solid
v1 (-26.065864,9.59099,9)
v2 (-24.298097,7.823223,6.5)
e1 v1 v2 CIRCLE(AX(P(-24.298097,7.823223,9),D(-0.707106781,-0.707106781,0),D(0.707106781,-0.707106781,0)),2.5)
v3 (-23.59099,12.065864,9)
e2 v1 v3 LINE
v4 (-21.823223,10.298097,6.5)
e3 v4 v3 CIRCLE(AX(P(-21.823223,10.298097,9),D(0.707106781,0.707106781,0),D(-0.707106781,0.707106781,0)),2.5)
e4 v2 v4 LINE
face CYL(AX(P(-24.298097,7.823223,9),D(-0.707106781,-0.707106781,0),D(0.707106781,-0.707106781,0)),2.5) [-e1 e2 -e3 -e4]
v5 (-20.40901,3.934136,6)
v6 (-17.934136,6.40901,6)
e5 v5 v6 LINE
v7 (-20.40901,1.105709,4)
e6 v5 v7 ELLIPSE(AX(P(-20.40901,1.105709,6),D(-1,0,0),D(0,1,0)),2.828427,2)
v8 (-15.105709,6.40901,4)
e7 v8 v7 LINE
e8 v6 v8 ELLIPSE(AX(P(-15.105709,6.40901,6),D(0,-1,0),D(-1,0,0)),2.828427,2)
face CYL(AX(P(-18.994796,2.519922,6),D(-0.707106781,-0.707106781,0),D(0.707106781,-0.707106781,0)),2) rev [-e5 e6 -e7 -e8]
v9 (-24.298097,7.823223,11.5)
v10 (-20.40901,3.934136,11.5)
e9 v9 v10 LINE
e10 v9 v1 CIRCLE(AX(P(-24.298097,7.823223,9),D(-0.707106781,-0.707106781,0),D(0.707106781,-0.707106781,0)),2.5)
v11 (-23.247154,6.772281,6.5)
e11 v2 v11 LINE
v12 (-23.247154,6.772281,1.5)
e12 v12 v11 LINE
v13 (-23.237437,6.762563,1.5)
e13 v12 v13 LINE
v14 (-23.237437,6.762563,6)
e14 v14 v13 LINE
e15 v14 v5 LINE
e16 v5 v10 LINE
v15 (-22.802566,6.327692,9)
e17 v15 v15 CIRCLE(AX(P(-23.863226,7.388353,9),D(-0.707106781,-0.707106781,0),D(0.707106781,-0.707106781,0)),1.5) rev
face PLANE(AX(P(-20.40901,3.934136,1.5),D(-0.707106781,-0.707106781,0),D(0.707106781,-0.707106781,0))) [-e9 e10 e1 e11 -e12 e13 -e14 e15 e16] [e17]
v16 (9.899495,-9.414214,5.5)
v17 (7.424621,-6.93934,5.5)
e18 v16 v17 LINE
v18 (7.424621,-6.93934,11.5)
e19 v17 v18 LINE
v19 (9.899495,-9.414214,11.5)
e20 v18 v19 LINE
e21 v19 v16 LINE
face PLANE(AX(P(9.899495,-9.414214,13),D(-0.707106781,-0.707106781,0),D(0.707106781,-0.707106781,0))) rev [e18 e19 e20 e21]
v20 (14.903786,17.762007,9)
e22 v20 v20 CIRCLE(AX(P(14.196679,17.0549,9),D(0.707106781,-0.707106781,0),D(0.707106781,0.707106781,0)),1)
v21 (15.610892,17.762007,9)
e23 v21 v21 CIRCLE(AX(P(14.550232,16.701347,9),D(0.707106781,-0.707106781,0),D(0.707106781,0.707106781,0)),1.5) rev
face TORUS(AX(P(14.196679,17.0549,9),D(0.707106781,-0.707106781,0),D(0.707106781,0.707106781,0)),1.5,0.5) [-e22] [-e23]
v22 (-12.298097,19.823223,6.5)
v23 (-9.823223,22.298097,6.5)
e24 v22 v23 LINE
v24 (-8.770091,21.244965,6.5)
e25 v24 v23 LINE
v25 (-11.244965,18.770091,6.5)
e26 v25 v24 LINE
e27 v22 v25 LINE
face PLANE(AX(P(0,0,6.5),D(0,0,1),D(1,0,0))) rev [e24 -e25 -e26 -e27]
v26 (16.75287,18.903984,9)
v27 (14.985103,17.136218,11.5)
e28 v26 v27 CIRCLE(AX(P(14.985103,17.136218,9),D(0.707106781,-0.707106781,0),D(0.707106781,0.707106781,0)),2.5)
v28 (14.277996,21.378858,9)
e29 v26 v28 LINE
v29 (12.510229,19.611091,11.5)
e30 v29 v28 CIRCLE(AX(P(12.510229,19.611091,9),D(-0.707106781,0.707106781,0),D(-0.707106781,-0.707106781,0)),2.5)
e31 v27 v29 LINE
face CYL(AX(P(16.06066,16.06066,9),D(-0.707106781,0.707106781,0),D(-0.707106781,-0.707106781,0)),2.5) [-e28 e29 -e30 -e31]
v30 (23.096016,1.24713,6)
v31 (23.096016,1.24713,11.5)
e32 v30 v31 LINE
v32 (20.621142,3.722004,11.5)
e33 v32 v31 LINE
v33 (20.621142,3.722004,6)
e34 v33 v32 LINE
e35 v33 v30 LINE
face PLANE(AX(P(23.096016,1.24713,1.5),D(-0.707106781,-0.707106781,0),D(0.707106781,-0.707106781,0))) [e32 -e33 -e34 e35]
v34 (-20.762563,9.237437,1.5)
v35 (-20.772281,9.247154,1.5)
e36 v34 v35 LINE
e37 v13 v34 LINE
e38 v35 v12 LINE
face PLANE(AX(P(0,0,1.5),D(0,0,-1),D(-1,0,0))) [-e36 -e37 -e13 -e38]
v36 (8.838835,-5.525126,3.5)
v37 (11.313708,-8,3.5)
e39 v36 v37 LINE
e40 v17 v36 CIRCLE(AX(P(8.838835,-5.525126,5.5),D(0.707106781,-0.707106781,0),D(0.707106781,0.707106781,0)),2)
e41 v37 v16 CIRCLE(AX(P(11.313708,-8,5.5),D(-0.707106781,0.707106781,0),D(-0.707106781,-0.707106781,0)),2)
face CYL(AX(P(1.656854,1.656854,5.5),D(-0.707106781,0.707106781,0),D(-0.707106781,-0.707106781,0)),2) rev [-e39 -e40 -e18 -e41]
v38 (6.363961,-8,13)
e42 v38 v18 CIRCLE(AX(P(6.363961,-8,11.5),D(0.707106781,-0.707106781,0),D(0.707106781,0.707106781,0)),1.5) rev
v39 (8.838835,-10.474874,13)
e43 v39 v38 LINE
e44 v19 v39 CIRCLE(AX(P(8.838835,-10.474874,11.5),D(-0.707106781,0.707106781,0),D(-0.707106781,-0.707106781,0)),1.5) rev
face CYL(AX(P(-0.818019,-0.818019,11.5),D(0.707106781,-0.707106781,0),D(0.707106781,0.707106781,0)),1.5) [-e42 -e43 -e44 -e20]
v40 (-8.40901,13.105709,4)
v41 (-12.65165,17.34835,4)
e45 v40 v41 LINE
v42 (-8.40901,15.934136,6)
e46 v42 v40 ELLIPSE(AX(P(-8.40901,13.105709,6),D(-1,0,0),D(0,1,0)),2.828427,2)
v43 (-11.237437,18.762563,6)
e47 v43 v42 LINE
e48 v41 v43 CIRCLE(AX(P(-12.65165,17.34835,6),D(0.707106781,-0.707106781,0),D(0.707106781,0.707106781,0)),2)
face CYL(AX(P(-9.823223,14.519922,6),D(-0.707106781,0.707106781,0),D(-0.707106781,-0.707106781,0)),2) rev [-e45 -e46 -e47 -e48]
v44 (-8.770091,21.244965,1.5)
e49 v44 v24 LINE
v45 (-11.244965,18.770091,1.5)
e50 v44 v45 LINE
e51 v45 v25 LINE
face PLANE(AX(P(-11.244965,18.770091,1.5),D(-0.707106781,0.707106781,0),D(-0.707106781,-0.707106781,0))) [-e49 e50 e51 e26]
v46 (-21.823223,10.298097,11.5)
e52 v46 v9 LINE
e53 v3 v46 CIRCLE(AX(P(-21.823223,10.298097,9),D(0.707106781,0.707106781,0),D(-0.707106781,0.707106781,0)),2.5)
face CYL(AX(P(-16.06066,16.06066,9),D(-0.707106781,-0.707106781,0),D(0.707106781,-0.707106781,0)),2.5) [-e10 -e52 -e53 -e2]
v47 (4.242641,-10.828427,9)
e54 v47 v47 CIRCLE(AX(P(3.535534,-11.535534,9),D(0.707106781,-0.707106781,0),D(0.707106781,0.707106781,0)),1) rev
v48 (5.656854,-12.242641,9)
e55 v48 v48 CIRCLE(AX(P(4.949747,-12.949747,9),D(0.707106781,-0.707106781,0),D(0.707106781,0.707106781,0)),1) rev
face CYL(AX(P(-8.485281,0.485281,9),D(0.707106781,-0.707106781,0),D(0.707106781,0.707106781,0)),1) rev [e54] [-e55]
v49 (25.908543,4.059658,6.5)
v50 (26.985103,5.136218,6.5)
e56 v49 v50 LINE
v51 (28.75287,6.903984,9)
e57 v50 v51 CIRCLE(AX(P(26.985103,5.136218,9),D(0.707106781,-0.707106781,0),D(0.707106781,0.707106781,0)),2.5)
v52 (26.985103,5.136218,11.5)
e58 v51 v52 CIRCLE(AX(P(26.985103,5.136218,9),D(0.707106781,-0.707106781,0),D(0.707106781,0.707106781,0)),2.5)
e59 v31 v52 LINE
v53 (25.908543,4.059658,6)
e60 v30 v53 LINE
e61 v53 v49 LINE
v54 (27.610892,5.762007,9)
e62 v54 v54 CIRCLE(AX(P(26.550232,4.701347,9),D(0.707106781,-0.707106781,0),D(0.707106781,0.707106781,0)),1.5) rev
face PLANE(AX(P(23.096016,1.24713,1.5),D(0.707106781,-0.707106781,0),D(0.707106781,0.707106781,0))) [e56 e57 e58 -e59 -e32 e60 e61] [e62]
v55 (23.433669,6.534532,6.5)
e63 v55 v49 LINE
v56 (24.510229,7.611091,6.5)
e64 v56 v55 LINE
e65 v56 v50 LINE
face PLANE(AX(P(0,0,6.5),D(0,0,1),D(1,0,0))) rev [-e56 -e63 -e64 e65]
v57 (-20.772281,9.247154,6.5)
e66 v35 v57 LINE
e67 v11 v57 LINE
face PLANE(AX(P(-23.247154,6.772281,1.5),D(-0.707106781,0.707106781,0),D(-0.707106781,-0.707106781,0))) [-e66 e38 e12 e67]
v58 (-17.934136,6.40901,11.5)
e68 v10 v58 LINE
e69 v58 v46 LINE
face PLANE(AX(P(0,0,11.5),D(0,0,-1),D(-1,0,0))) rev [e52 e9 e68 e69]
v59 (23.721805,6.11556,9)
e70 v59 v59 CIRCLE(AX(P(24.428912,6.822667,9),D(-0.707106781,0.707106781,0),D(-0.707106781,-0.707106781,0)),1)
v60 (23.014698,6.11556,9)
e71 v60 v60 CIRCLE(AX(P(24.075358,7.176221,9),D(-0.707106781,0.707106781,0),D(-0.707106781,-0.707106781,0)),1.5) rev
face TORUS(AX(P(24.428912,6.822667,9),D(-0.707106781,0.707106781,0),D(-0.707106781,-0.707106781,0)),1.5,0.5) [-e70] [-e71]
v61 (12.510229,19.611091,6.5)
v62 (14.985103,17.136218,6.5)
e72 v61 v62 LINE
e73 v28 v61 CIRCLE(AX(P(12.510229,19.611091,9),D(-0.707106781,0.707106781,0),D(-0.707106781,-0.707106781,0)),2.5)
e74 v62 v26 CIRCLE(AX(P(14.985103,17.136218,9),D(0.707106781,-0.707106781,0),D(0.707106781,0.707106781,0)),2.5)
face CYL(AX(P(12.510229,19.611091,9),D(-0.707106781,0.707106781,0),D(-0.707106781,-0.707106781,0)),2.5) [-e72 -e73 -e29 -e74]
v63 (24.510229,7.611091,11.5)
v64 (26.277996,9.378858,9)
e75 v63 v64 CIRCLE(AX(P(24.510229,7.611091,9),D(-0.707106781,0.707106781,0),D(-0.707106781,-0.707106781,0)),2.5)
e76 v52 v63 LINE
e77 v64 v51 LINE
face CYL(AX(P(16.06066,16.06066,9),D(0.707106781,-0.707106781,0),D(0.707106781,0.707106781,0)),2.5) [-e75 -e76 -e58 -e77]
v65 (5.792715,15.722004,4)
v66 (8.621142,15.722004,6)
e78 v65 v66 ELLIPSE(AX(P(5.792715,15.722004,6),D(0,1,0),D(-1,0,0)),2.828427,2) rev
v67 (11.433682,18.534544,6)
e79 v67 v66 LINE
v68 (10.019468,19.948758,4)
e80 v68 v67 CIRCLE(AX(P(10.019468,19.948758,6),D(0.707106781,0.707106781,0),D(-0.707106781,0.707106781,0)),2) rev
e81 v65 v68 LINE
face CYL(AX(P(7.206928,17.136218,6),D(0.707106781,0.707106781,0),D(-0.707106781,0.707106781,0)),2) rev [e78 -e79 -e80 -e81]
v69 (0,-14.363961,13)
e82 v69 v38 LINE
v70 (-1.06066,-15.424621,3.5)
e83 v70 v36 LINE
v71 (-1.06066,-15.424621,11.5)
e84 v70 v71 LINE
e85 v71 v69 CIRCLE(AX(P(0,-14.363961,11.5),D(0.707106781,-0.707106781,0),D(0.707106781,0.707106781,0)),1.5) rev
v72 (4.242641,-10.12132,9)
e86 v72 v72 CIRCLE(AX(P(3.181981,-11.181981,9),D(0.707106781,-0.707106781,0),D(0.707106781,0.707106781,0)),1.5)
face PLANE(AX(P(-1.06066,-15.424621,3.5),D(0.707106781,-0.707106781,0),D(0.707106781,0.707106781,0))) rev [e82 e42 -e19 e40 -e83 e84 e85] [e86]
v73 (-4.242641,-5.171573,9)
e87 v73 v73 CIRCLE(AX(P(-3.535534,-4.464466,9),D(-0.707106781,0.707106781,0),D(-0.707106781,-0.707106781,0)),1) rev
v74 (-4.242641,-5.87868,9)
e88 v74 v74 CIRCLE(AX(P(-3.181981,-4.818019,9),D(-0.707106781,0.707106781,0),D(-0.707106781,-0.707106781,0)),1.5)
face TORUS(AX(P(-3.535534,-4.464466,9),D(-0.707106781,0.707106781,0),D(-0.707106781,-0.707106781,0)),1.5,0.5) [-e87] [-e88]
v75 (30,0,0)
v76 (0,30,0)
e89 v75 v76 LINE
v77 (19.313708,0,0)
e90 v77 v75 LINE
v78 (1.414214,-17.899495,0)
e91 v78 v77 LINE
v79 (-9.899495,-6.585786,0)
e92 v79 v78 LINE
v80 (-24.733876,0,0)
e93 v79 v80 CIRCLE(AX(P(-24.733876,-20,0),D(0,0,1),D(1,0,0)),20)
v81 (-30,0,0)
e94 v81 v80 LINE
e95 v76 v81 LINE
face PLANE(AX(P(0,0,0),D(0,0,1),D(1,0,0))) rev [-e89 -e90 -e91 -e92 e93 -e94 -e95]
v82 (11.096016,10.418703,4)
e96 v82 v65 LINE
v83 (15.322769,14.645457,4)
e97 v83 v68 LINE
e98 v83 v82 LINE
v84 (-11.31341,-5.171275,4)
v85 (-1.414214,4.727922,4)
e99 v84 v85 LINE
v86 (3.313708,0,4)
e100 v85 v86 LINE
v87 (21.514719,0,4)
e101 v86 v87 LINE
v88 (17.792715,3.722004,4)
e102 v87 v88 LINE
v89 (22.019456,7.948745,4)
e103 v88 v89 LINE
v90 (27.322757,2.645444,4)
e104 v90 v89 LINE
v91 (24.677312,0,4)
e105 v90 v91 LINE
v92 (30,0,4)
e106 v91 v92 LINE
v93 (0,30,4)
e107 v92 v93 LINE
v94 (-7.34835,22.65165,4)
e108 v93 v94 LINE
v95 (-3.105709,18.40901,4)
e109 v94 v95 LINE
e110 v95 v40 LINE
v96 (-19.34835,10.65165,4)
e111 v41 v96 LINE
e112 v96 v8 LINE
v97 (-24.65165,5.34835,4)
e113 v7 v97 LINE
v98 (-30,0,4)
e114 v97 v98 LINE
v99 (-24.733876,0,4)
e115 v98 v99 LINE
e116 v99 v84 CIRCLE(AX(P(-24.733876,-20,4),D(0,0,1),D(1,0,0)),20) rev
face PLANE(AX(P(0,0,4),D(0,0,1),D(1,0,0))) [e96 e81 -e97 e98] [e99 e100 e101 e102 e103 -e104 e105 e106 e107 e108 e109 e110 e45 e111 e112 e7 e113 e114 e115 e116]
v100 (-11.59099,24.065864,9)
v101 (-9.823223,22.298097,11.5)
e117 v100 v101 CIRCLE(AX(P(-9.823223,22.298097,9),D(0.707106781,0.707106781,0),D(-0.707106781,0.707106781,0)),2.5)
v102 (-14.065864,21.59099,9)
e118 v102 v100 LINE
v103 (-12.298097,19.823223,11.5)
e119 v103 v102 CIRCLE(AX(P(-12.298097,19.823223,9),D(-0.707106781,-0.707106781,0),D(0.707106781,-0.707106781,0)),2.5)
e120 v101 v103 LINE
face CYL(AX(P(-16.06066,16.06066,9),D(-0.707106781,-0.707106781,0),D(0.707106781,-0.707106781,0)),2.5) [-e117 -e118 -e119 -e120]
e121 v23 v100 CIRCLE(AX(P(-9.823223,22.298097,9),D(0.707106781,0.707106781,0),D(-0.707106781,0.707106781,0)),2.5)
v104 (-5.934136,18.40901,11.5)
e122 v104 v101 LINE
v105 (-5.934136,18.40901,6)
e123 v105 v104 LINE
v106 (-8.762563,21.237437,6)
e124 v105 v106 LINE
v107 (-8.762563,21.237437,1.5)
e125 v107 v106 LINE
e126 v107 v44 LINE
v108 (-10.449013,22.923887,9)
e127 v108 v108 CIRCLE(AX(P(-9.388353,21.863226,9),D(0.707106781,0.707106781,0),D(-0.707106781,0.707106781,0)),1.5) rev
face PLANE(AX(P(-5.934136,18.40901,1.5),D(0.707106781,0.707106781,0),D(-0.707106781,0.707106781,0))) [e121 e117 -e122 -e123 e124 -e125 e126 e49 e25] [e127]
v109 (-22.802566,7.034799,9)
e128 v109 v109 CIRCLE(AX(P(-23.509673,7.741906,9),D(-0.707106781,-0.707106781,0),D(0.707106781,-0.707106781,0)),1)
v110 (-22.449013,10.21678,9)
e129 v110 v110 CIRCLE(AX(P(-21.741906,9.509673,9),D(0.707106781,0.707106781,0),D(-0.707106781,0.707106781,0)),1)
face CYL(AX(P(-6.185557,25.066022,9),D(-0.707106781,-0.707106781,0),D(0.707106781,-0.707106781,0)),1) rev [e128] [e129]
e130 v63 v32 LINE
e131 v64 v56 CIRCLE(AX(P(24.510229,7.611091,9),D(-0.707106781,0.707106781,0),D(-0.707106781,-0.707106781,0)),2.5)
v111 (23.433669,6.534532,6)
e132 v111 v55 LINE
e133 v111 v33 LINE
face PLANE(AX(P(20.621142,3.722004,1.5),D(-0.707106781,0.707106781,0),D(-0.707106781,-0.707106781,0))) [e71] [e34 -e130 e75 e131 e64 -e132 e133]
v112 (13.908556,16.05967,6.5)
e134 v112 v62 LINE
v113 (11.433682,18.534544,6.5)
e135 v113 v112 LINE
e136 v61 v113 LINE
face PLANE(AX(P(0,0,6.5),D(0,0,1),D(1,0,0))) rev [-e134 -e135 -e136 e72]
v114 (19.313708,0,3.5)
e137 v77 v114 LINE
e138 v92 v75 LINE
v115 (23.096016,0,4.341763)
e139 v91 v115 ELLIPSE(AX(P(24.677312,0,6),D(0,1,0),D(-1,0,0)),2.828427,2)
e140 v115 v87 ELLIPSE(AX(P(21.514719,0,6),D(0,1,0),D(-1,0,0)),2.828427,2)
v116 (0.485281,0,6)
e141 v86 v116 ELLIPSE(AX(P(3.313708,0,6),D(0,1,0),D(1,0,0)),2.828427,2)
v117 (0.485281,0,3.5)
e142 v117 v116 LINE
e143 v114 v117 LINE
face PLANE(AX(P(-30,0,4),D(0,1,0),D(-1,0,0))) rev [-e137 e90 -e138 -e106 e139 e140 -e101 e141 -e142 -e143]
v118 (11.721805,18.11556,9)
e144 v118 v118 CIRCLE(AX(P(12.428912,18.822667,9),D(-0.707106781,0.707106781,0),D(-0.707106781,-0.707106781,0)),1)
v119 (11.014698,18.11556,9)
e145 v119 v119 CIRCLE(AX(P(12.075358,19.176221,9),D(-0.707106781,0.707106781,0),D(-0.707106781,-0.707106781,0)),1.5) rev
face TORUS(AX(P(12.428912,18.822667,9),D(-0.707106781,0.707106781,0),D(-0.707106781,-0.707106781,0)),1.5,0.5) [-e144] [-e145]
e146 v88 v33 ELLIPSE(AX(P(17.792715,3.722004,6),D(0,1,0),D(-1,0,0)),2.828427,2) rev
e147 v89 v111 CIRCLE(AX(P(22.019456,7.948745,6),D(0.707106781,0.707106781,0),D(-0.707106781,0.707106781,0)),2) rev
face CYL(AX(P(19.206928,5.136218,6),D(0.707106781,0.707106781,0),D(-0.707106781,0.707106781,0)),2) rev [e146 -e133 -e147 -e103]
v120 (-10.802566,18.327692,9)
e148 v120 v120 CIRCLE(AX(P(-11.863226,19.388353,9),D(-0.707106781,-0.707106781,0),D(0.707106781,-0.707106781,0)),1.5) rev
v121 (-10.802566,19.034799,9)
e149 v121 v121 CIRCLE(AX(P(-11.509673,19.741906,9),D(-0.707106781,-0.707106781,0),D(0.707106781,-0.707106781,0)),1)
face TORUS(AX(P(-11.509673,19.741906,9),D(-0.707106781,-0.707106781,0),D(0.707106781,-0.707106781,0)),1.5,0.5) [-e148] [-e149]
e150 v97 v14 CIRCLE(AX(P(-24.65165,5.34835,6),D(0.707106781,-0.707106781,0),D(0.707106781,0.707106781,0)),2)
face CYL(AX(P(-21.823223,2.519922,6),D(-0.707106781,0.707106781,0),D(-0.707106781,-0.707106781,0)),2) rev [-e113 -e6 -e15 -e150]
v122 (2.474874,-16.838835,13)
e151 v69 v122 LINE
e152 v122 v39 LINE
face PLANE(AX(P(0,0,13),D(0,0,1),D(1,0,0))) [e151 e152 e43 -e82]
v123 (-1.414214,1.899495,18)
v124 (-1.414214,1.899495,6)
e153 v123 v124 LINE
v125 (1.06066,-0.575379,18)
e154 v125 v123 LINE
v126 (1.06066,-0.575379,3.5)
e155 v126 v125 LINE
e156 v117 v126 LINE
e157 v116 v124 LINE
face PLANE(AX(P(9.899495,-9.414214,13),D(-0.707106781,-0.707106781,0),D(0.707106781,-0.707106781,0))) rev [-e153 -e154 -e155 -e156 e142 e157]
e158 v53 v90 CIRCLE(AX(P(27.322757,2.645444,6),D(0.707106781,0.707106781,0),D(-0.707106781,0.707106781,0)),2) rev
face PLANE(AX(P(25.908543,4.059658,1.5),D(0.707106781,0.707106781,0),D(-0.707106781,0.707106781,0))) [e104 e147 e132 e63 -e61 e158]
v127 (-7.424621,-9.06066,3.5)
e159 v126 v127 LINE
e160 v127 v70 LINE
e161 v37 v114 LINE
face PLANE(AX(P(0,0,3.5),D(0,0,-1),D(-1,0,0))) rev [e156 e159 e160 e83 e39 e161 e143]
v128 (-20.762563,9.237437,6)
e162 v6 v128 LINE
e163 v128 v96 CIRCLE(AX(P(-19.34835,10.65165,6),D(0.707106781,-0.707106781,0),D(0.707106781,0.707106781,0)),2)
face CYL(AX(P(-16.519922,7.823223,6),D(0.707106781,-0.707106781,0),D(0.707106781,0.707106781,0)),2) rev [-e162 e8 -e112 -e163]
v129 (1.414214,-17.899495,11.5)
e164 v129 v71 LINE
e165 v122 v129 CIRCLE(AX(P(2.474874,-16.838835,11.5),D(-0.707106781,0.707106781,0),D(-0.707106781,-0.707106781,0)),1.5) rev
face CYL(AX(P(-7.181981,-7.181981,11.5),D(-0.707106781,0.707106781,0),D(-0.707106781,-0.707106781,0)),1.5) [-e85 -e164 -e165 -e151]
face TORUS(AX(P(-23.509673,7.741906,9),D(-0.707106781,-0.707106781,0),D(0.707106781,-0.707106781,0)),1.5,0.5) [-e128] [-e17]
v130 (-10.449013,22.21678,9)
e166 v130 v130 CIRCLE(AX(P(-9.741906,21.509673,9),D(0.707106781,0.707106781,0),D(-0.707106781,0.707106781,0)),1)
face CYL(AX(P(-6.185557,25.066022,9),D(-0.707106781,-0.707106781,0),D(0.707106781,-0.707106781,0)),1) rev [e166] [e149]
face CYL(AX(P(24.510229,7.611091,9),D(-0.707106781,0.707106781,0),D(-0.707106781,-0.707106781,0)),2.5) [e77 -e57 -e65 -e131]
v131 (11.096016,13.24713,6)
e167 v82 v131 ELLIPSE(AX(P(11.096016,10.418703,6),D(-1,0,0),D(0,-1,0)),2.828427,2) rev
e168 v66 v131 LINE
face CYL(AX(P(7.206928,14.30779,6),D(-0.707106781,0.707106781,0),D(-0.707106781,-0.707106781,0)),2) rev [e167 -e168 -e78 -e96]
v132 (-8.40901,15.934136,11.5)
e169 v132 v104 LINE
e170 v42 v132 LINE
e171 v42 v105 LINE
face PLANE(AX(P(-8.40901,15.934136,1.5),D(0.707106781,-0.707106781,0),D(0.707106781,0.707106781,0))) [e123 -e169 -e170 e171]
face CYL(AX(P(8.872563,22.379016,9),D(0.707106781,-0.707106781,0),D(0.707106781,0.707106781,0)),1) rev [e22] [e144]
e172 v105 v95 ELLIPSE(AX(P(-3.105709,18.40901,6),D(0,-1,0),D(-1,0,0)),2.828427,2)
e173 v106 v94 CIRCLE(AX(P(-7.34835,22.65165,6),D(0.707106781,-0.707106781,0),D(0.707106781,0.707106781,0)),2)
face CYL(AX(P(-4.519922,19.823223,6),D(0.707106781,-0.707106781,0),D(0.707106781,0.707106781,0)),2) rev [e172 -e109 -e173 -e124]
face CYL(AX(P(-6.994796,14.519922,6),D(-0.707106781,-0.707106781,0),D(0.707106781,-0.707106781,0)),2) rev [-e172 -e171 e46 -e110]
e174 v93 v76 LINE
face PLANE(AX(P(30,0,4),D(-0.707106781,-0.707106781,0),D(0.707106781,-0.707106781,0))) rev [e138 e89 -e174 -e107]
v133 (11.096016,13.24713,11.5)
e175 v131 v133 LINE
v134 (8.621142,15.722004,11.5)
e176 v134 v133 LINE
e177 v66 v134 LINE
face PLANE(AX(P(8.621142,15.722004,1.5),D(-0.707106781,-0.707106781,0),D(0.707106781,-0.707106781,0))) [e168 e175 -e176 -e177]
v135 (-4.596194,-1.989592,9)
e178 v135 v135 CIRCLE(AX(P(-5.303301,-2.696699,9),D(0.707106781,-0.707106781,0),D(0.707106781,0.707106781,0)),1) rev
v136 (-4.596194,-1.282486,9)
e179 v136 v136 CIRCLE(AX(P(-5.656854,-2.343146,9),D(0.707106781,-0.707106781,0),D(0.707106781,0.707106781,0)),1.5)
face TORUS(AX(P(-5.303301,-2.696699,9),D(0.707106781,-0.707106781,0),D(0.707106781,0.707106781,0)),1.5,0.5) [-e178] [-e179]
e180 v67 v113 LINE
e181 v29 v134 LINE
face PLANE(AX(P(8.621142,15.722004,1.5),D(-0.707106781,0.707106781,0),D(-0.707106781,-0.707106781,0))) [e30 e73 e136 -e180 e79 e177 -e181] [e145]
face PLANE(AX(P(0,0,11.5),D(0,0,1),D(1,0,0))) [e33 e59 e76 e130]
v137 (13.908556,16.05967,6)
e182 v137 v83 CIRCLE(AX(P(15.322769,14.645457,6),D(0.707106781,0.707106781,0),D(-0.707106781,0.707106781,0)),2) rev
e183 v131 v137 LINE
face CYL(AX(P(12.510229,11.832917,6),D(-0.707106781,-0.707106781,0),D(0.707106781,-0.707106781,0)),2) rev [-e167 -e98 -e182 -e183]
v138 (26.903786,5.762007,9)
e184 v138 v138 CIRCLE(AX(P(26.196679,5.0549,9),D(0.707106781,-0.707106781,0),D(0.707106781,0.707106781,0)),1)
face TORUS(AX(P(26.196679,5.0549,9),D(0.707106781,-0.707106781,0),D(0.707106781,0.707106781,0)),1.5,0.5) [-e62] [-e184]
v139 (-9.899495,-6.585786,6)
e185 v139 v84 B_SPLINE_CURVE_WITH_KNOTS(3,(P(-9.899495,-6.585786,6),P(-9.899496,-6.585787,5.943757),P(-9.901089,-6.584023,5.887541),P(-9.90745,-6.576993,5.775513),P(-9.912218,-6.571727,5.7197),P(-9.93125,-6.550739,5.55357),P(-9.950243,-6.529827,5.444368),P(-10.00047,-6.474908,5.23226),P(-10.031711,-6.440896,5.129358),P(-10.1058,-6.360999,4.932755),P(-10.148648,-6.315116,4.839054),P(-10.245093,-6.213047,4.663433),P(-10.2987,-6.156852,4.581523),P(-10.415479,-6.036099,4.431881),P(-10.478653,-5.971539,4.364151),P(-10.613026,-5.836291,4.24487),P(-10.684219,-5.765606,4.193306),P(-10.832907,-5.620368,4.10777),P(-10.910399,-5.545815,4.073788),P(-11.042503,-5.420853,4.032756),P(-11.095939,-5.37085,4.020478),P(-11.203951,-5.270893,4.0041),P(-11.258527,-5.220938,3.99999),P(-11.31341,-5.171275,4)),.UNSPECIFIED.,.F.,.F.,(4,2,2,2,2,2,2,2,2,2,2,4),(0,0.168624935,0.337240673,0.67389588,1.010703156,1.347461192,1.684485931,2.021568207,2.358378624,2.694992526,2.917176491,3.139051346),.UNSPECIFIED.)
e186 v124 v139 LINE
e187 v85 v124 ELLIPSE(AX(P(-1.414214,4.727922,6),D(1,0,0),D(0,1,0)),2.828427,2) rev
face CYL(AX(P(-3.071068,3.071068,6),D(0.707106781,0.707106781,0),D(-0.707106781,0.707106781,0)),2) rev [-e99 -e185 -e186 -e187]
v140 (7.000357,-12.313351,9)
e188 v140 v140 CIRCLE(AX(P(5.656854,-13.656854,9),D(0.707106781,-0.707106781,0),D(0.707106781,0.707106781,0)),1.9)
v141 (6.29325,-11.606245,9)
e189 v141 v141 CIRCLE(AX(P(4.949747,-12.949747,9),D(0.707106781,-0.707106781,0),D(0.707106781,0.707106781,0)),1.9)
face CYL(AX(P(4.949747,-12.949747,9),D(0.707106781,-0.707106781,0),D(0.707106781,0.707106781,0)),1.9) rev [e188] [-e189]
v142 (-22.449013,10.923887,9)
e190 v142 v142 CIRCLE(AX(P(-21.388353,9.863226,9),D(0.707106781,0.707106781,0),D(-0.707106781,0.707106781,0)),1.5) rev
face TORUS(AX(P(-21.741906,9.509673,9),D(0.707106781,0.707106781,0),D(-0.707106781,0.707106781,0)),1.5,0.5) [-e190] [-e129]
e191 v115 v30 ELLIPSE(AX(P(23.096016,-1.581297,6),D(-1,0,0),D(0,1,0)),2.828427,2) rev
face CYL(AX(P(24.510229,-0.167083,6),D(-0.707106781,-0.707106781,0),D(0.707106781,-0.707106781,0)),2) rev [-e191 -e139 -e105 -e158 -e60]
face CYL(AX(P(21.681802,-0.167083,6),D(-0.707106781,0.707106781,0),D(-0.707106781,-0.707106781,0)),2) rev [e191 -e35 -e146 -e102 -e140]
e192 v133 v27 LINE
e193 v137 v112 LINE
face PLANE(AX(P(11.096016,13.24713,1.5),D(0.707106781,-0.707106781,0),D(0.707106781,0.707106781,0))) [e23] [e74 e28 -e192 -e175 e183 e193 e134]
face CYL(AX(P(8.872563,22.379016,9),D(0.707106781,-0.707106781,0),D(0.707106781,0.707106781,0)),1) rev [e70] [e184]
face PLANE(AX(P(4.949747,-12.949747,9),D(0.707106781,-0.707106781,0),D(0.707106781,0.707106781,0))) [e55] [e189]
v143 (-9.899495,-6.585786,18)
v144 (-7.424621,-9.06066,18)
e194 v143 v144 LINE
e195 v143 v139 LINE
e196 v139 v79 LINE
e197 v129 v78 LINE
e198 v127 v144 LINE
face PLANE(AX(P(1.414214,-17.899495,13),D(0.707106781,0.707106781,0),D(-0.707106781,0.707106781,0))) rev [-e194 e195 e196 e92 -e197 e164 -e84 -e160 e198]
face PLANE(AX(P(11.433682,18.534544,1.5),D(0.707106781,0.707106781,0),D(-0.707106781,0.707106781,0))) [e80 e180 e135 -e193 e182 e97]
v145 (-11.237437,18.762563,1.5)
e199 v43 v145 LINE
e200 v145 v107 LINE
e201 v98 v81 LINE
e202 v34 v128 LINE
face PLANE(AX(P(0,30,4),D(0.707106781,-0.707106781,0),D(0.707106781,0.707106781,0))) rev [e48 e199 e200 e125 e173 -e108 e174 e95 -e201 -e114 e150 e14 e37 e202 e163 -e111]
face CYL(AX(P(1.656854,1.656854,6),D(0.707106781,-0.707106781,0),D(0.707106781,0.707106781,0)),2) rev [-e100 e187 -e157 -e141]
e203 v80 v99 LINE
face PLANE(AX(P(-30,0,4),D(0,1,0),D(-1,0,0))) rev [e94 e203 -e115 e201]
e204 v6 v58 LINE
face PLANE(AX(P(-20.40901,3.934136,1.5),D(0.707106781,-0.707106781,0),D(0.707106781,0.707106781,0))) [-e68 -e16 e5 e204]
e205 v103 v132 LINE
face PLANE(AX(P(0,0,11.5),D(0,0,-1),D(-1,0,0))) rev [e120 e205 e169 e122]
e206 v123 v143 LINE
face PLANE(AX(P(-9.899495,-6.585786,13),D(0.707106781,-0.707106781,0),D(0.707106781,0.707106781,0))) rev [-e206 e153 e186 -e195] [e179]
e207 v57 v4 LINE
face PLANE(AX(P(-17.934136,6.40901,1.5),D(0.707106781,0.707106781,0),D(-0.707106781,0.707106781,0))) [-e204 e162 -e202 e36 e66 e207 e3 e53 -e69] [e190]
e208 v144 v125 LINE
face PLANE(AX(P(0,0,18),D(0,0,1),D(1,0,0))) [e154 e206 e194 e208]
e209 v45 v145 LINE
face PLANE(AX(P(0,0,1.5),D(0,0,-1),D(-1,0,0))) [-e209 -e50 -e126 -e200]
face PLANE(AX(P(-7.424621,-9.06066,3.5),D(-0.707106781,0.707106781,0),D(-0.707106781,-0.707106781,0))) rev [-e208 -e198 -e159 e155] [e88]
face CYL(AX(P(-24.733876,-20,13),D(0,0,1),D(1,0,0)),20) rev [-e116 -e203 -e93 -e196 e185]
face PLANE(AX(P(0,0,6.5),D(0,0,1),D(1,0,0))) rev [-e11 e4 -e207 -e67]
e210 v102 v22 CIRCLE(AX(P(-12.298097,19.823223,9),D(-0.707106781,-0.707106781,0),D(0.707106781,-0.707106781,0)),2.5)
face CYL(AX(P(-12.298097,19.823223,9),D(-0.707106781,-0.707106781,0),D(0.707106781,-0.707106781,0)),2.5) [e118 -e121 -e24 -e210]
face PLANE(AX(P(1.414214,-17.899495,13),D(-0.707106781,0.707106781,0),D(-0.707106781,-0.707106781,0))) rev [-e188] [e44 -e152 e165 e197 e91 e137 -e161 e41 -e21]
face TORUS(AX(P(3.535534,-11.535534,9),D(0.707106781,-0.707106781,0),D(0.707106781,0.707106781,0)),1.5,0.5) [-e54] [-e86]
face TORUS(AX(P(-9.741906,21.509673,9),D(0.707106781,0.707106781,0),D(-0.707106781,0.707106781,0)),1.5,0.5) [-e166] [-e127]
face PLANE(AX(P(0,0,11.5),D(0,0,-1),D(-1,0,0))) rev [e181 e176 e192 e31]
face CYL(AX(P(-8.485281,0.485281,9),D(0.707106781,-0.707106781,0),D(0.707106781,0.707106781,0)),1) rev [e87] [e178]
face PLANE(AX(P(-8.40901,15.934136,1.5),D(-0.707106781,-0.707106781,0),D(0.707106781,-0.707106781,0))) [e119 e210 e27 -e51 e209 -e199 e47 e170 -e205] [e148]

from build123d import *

# Parameters (mm, degrees)
BOSS_EXTRUDE1_DEPTH   = 4
BOSS_EXTRUDE2_START   = -4
BOSS_EXTRUDE2_DEPTH   = 13
BOSS_EXTRUDE3_START   = 2.5
BOSS_EXTRUDE3_DEPTH   = 5
BOSS_EXTRUDE3_2_DEPTH = 5
BOSS_EXTRUDE3_3_DEPTH = 5
BOSS_EXTRUDE3_4_DEPTH = 5
BOSS_EXTRUDE4_DEPTH   = 10
SKETCH6_R             = 1
CUT_EXTRUDE5_DEPTH    = 25
SKETCH7_R             = 1
CUT_EXTRUDE6_DEPTH    = 25
FILLET2_R             = 2.5
CUT_EXTRUDE8_DEPTH    = 9.5
SKETCH11_R            = 1
CUT_EXTRUDE9_DEPTH    = 20
FILLET3_R             = 20
BOSS_EXTRUDE5_DEPTH   = 5
BOSS_EXTRUDE6_DEPTH   = 3.5
SKETCH15_R            = 1.9
CUT_EXTRUDE10_DEPTH   = 1
FILLET5_R             = 0.5
FILLET6_R             = 0.5
FILLET7_R             = 2
FILLET8_R             = 1.5


# Some blends are built 0.0001 mm under size
with BuildPart() as part:
    # Sketch1 → Boss-Extrude1 (new body)
    with BuildSketch(Plane.XY):
        Polygon((-30, 0), (30, 0), (0, 30), align=None)
    extrude(amount=BOSS_EXTRUDE1_DEPTH)

    # Sketch2 → Boss-Extrude2 (add)
    with BuildSketch(Plane.XY.offset(4).offset(BOSS_EXTRUDE2_START)):
        Polygon((1.414213562, -17.899494937), (-9.899494937, -6.585786438), (-1.414213562, 1.899494937), (9.899494937, -9.414213562), align=None)
    extrude(amount=BOSS_EXTRUDE2_DEPTH)



with BuildPart() as body_2:
    # Sketch5 → Boss-Extrude3 (new body)
    with BuildSketch(Plane.XY.offset(4).offset(BOSS_EXTRUDE3_START)):
        Polygon((-8.409009742, 15.934136008), (-14.065863992, 21.590990258), (-11.590990258, 24.065863992), (-5.934136008, 18.409009742), align=None)
    extrude(amount=BOSS_EXTRUDE3_DEPTH)


with BuildPart() as body_3:
    # Sketch5 → Boss-Extrude3 2 (new body)
    with BuildSketch(Plane.XY.offset(4).offset(BOSS_EXTRUDE3_START)):
        Polygon((-20.409009742, 3.934136008), (-26.065863992, 9.590990258), (-23.590990258, 12.065863992), (-17.934136008, 6.409009742), align=None)
    extrude(amount=BOSS_EXTRUDE3_2_DEPTH)


with BuildPart() as body_4:
    # Sketch5 → Boss-Extrude3 3 (new body)
    with BuildSketch(Plane.XY.offset(4).offset(BOSS_EXTRUDE3_START)):
        Polygon((8.621141777, 15.722003974), (14.277996026, 21.378858223), (16.75286976, 18.903984489), (11.096015511, 13.24713024), align=None)
    extrude(amount=BOSS_EXTRUDE3_3_DEPTH)


with BuildPart() as body_5:
    # Sketch5 → Boss-Extrude3 4 (new body)
    with BuildSketch(Plane.XY.offset(4).offset(BOSS_EXTRUDE3_START)):
        Polygon((20.621141777, 3.722003974), (26.277996026, 9.378858223), (28.75286976, 6.903984489), (23.096015511, 1.24713024), align=None)
    extrude(amount=BOSS_EXTRUDE3_4_DEPTH)


with BuildPart() as part_1:
    add(part.part)

    add(body_2.part)  # Boss-Extrude4 merges body 2

    add(body_3.part)  # Boss-Extrude4 merges body 3

    add(body_4.part)  # Boss-Extrude4 merges body 4

    add(body_5.part)  # Boss-Extrude4 merges body 5
    # Sketch8 → Boss-Extrude4 (add)
    with BuildSketch(Plane.XY.offset(11.5)):
        Polygon((-20.409009742, 3.934136008), (-17.934136008, 6.409009742), (-20.77228069, 9.247154424), (-23.247154424, 6.77228069), align=None)
        Polygon((-8.409009742, 15.934136008), (-5.934136008, 18.409009742), (-8.770090905, 21.24496464), (-11.24496464, 18.770090905), align=None)
        Polygon((8.621141777, 15.722003974), (11.096015511, 13.24713024), (13.908555635, 16.059670364), (11.433681901, 18.534544098), align=None)
        Polygon((23.096015511, 1.24713024), (20.621141777, 3.722003974), (23.433669477, 6.534531674), (25.908543211, 4.05965794), align=None)
    extrude(amount=-BOSS_EXTRUDE4_DEPTH)

    # Sketch6 → Cut-Extrude5 (cut)
    with BuildSketch(Plane(origin=(10.924442636, -10.924442636, 0), x_dir=(0.7071067811865506, 0.7071067811865446, 0), z_dir=(0.7071067811865446, -0.7071067811865506, 0))):
        with Locations((22.098203436, 9)):
            Circle(SKETCH6_R)
    extrude(amount=-CUT_EXTRUDE5_DEPTH, mode=Mode.SUBTRACT)

    # Sketch7 → Cut-Extrude6 (cut)
    with BuildSketch(Plane(origin=(-8.237436867, -8.237436867, 0), x_dir=(0, 0, 1), z_dir=(-0.7071067811865501, -0.7071067811865449, 0))):
        with Locations(Location((9, 22.098203436, 0), (0, 0, 270))):
            Circle(SKETCH7_R)
    extrude(amount=-CUT_EXTRUDE6_DEPTH, mode=Mode.SUBTRACT)

    # Fillet2
    fillet2_edges = [part_1.edges().sort_by_distance(p)[0] for p in [
        (15.515432893, 20.141421356, 11.5),
        (15.515432893, 20.141421356, 6.5),
        (27.515432893, 8.141421356, 6.5),
        (27.515432893, 8.141421356, 11.5),
        (-24.828427125, 10.828427125, 6.5),
        (-12.828427125, 22.828427125, 6.5),
        (-12.828427125, 22.828427125, 11.5),
        (-24.828427125, 10.828427125, 11.5),
    ]]
    fillet(fillet2_edges, radius=FILLET2_R - 0.0001)  # a hair under: the kernel refuses the full size

    # Sketch10 → Cut-Extrude8 (cut)
    with BuildSketch(Plane.XY.offset(13)):
        Polygon((-7.424621202, -9.060660172), (-1.060660172, -15.424621202), (7.424621202, -6.939339828), (1.060660172, -0.575378798), align=None)
    extrude(amount=-CUT_EXTRUDE8_DEPTH, mode=Mode.SUBTRACT)

    # Sketch11 → Cut-Extrude9 (cut)
    with BuildSketch(Plane(origin=(9.656854249, -9.656854249, 0), x_dir=(0, 0, -1), z_dir=(0.7071067811865464, -0.7071067811865487, 0))):
        with Locations(Location((-9, -5.656854249, 0), (0, 0, 90))):
            Circle(SKETCH11_R)
    extrude(amount=-CUT_EXTRUDE9_DEPTH, mode=Mode.SUBTRACT)

    # Fillet3
    # the kernel refuses this fillet: 20 mm, written as the material it adds along each edge
    with BuildSketch(Plane(origin=(-3.313708499, 0, 0), x_dir=(-0.7071067811865843, -0.7071067811865105, 0), z_dir=(0, 0, 1))) as fillet3_piece_1:
        with BuildLine():
            CenterArc((29.288481627, -1.004210379), FILLET3_R, 177.121938999, 47.878061001)
            Line((15.146346003, -15.146346003), (14.863503291, -15.429188716))
            Line((14.863503291, -15.429188716), (-0.282842712, -0.282842712))
            Line((-0.282842712, -0.282842712), (0, 0.4))
            ThreePointArc((0, 0.4), (4.656854249, 0.4), (8.914213036, 0.020084208))
            Line((8.914213036, 0.020084208), (9.313708499, 0))
        make_face()
    extrude(amount=4)

    # Sketch13 → Boss-Extrude5 (add)
    with BuildSketch(Plane.XY.offset(13)):
        Polygon((-1.414213562, 1.899494937), (-9.899494937, -6.585786438), (-7.424621202, -9.060660172), (1.060660172, -0.575378798), align=None)
    extrude(amount=BOSS_EXTRUDE5_DEPTH)

    # Sketch14 → Boss-Extrude6 (add)
    with BuildSketch(Plane.XY.offset(3.5)):
        Polygon((0.485281374, 0), (9.899494937, -9.414213562), (19.313708499, 0), align=None)
    extrude(amount=-BOSS_EXTRUDE6_DEPTH)

    # Sketch15 → Cut-Extrude10 (cut)
    with BuildSketch(Plane(origin=(9.656854249, -9.656854249, 0), x_dir=(0, 0, -1), z_dir=(0.7071067811865464, -0.7071067811865487, 0))):
        with Locations(Location((-9, -5.656854249, 0), (0, 0, 90))):
            Circle(SKETCH15_R)
    extrude(amount=-CUT_EXTRUDE10_DEPTH, mode=Mode.SUBTRACT)

    # Fillet5
    fillet5_edges = [part_1.edges().sort_by_distance(p)[0] for p in [
        (-3.889087297, -5.525126266, 9),
        (-6.363961031, -3.050252532, 9),
    ]]
    fillet(fillet5_edges, radius=FILLET5_R)

    # Fillet6
    fillet6_edges = [part_1.edges().sort_by_distance(p)[0] for p in [
        (11.368251622, 18.469113819, 9),
        (23.368251622, 6.469113819, 9),
        (13.843125356, 15.994240085, 9),
        (25.843125356, 3.994240085, 9),
        (-12.57033315, 20.095459415, 9),
        (-22.095459415, 10.57033315, 9),
        (-10.095459415, 22.57033315, 9),
        (-24.57033315, 8.095459415, 9),
        (2.474873734, -11.889087297, 9),
    ]]
    fillet(fillet6_edges, radius=FILLET6_R)

    # Fillet7
    # the kernel refuses this fillet: 2 mm, written as the material it adds along each edge
    with BuildSketch(Plane(origin=(20.621141777, 3.722003974, 4), x_dir=(-0.7071067811865442, 0.7071067811865509, 0), z_dir=(0.7071067811865508, 0.7071067811865442, 0))) as fillet7_piece_1:
        with BuildLine():
            CenterArc((FILLET7_R, FILLET7_R), FILLET7_R, 180, 90)
            Line((0, FILLET7_R), (0, 0))
            Line((0, 0), (FILLET7_R, 0))
        make_face()
    extrude(amount=3.977514818)
    with BuildSketch(Plane(origin=(23.096015511, 1.24713024, 4), x_dir=(-0.7071067811865508, -0.7071067811865444, 0), z_dir=(-0.7071067811865444, 0.7071067811865508, 0))) as fillet7_piece_2_section:
        with BuildLine():
            CenterArc((FILLET7_R, FILLET7_R), FILLET7_R, 180, 90)
            Line((0, FILLET7_R), (0, 0))
            Line((0, 0), (FILLET7_R, 0))
        make_face()
    fillet7_piece_2 = extrude(amount=3.5, mode=Mode.PRIVATE)
    fillet7_piece_2 = split(fillet7_piece_2, bisect_by=Plane(origin=(21.538358904, 0, 4.452946363), z_dir=(0, 1, 0)), keep=Keep.TOP, mode=Mode.PRIVATE)
    add(fillet7_piece_2)
    with BuildSketch(Plane(origin=(25.908543211, 4.05965794, 4), x_dir=(0.7071067811865442, -0.7071067811865509, 0), z_dir=(-0.7071067811865509, -0.7071067811865442, 0))) as fillet7_piece_3_section:
        with BuildLine():
            CenterArc((FILLET7_R, FILLET7_R), FILLET7_R, 180, 90)
            Line((0, FILLET7_R), (0, 0))
            Line((0, 0), (FILLET7_R, 0))
        make_face()
    fillet7_piece_3 = extrude(amount=3.977514818, mode=Mode.PRIVATE)
    fillet7_piece_3 = split(fillet7_piece_3, bisect_by=Plane(origin=(24.822542442, 0, 4.452927613), z_dir=(0, 1, 0)), keep=Keep.TOP, mode=Mode.PRIVATE)
    add(fillet7_piece_3)
    with BuildSketch(Plane(origin=(4.02081528, -3.535533906, 4), x_dir=(0, 0, 1), z_dir=(-0.7071067811865462, 0.7071067811865489, 0))) as fillet7_piece_4_section:
        with BuildLine():
            CenterArc((FILLET7_R, FILLET7_R), FILLET7_R, 180, 90)
            Line((0, FILLET7_R), (0, 0))
            Line((0, 0), (FILLET7_R, 0))
        make_face()
    fillet7_piece_4 = extrude(amount=7.686291501, mode=Mode.PRIVATE)
    fillet7_piece_4 = split(fillet7_piece_4, bisect_by=Plane(origin=(2.268861346, 0, 4.037443885), z_dir=(0, 1, 0)), keep=Keep.TOP, mode=Mode.PRIVATE)
    add(fillet7_piece_4)
    with BuildSketch(Plane(origin=(-9.899494937, -6.585786438, 4), x_dir=(0, 0, 1), z_dir=(0.7071067811865712, 0.707106781186524, 0))) as fillet7_piece_5_section:
        with BuildLine():
            CenterArc((FILLET7_R, -FILLET7_R), FILLET7_R, 90, 90)
            Line((0, -FILLET7_R), (0, 0))
            Line((0, 0), (FILLET7_R, 0))
        make_face()
    fillet7_piece_5 = extrude(amount=12, mode=Mode.PRIVATE)
    fillet7_piece_5 = fillet7_piece_5 - Plane(origin=(-24.733876437, -20, 4.452977165), x_dir=(-0.7071067811865476, -0.7071067811865476, 0), z_dir=(0, 0, -1)) * Cylinder(20, 33, mode=Mode.PRIVATE)
    add(fillet7_piece_5)
    with BuildSketch(Plane(origin=(-20.409009742, 3.934136008, 4), x_dir=(0.7071067811865449, -0.7071067811865502, 0), z_dir=(0.7071067811865502, 0.7071067811865448, 0)), Plane(origin=(-8.409009742, 15.934136008, 4), x_dir=(0.7071067811865444, -0.7071067811865508, 0), z_dir=(0.7071067811865507, 0.7071067811865444, 0)), Plane(origin=(8.621141777, 15.722003974, 4), x_dir=(-0.7071067811865503, -0.7071067811865448, 0), z_dir=(0.7071067811865448, -0.7071067811865503, 0))) as fillet7_piece_6:
        with BuildLine():
            CenterArc((FILLET7_R, -FILLET7_R), FILLET7_R, 90, 90)
            Line((0, -FILLET7_R), (0, 0))
            Line((0, 0), (FILLET7_R, 0))
        make_face()
    extrude(amount=3.5)
    with BuildSketch(Plane(origin=(-23.237436867, 6.762563133, 4), x_dir=(-0.7071067811865498, -0.7071067811865454, 0), z_dir=(0.7071067811865452, -0.7071067811865498, 0)), Plane(origin=(-17.934136008, 6.409009742, 4), x_dir=(0.7071067811865507, 0.7071067811865445, 0), z_dir=(-0.7071067811865445, 0.7071067811865507, 0)), Plane(origin=(-11.237436867, 18.762563133, 4), x_dir=(-0.7071067811865507, -0.7071067811865445, 0), z_dir=(0.7071067811865445, -0.7071067811865507, 0)), Plane(origin=(-5.934136008, 18.409009742, 4), x_dir=(0.7071067811865506, 0.7071067811865446, 0), z_dir=(-0.7071067811865446, 0.7071067811865506, 0))) as fillet7_piece_7:
        with BuildLine():
            CenterArc((FILLET7_R, -FILLET7_R), FILLET7_R, 90, 90)
            Line((0, -FILLET7_R), (0, 0))
            Line((0, 0), (FILLET7_R, 0))
        make_face()
    extrude(amount=4)
    with BuildSketch(Plane(origin=(7.424621202, -6.939339828, 3.5), x_dir=(0.7071067811865489, 0.7071067811865462, 0), z_dir=(0.7071067811865462, -0.7071067811865489, 0))) as fillet7_piece_8:
        with BuildLine():
            CenterArc((FILLET7_R, FILLET7_R), FILLET7_R, 180, 90)
            Line((0, FILLET7_R), (0, 0))
            Line((0, 0), (FILLET7_R, 0))
        make_face()
    extrude(amount=3.5)
    with BuildSketch(Plane(origin=(11.096015511, 13.24713024, 4), x_dir=(0.7071067811865447, -0.7071067811865505, 0), z_dir=(0.7071067811865505, 0.7071067811865447, 0)), Plane(origin=(11.433681901, 18.534544098, 4), x_dir=(-0.7071067811865447, 0.7071067811865505, 0), z_dir=(-0.7071067811865505, -0.7071067811865447, 0))) as fillet7_piece_9:
        with BuildLine():
            CenterArc((FILLET7_R, -FILLET7_R), FILLET7_R, 90, 90)
            Line((0, -FILLET7_R), (0, 0))
            Line((0, 0), (FILLET7_R, 0))
        make_face()
    extrude(amount=3.977532388)
    with BuildSketch(Plane(origin=(17.085607871, 0.186470068, 4), x_dir=(-0.7071067811865442, 0.7071067811865509, 0), z_dir=(0.7071067811865508, 0.7071067811865442, 0))) as fillet7_piece_10a_section:
        with BuildLine():
            CenterArc((FILLET7_R, FILLET7_R), FILLET7_R, 180, 90)
            Line((0, FILLET7_R), (0, 0))
            Line((0, 0), (FILLET7_R, 0))
        make_face()
    fillet7_piece_10a = extrude(amount=8.977514818, mode=Mode.PRIVATE)
    fillet7_piece_10a = split(fillet7_piece_10a, bisect_by=Plane(origin=(20.300970736, 4.042175015, 4.452790229), z_dir=(-0.7071067811865508, -0.7071067811865444, 0)), keep=Keep.TOP, mode=Mode.PRIVATE)
    with BuildSketch(Plane(origin=(23.096015511, 1.24713024, 4), x_dir=(-0.7071067811865508, -0.7071067811865444, 0), z_dir=(-0.7071067811865444, 0.7071067811865508, 0))) as fillet7_piece_10b_section:
        with BuildLine():
            CenterArc((FILLET7_R, FILLET7_R), FILLET7_R, 180, 90)
            Line((0, FILLET7_R), (0, 0))
            Line((0, 0), (FILLET7_R, 0))
        make_face()
    fillet7_piece_10b = extrude(amount=8.5, mode=Mode.PRIVATE)
    fillet7_piece_10b = split(fillet7_piece_10b, bisect_by=Plane(origin=(20.300970736, 3.401832933, 4.452790229), z_dir=(-0.7071067811865442, 0.7071067811865508, 0)), keep=Keep.TOP, mode=Mode.PRIVATE)
    fillet7_piece_10 = fillet7_piece_10a & fillet7_piece_10b
    add(fillet7_piece_10)
    with BuildSketch(Plane(origin=(25.908543211, 4.05965794, 4), x_dir=(0.7071067811865442, -0.7071067811865509, 0), z_dir=(-0.7071067811865509, -0.7071067811865442, 0))) as fillet7_piece_11a_section:
        with BuildLine():
            CenterArc((FILLET7_R, FILLET7_R), FILLET7_R, 180, 90)
            Line((0, FILLET7_R), (0, 0))
            Line((0, 0), (FILLET7_R, 0))
        make_face()
    fillet7_piece_11a = extrude(amount=8.977514818, mode=Mode.PRIVATE)
    fillet7_piece_11a = split(fillet7_piece_11a, bisect_by=Plane(origin=(22.803795324, 0, 4.536078457), z_dir=(0, 1, 0)), keep=Keep.TOP, mode=Mode.PRIVATE)
    fillet7_piece_11a = split(fillet7_piece_11a, bisect_by=Plane(origin=(23.316912133, 1.026233618, 4.536078457), z_dir=(-0.7071067811865508, -0.7071067811865444, 0)), keep=Keep.TOP, mode=Mode.PRIVATE)
    with BuildSketch(Plane(origin=(26.631549417, -2.288403666, 4), x_dir=(-0.7071067811865507, -0.7071067811865442, 0), z_dir=(-0.7071067811865444, 0.7071067811865508, 0))) as fillet7_piece_11b_section:
        with BuildLine():
            CenterArc((FILLET7_R, FILLET7_R), FILLET7_R, 180, 90)
            Line((0, FILLET7_R), (0, 0))
            Line((0, 0), (FILLET7_R, 0))
        make_face()
    fillet7_piece_11b = extrude(amount=8.5, mode=Mode.PRIVATE)
    fillet7_piece_11b = split(fillet7_piece_11b, bisect_by=Plane(origin=(23.388235698, 0, 4.536078457), z_dir=(0, 1, 0)), keep=Keep.TOP, mode=Mode.PRIVATE)
    fillet7_piece_11b = split(fillet7_piece_11b, bisect_by=Plane(origin=(22.875118889, 1.026233618, 4.536078457), z_dir=(0.7071067811865442, -0.7071067811865509, 0)), keep=Keep.TOP, mode=Mode.PRIVATE)
    fillet7_piece_11 = fillet7_piece_11a & fillet7_piece_11b
    add(fillet7_piece_11)
    with BuildSketch(Plane(origin=(-9.899494937, -6.585786438, 4), x_dir=(0, 0, 1), z_dir=(0.7071067811865712, 0.707106781186524, 0))) as fillet7_piece_12a_section:
        with BuildLine():
            CenterArc((FILLET7_R, -FILLET7_R), FILLET7_R, 90, 90)
            Line((0, -FILLET7_R), (0, 0))
            Line((0, 0), (FILLET7_R, 0))
        make_face()
    fillet7_piece_12a = extrude(amount=17, mode=Mode.PRIVATE)
    fillet7_piece_12a = split(fillet7_piece_12a, bisect_by=Plane(origin=(-1.734384603, 2.219665978, 4.452790229), z_dir=(0.7071067811865489, 0.7071067811865462, 0)), keep=Keep.TOP, mode=Mode.PRIVATE)
    with BuildSketch(Plane(origin=(4.02081528, -3.535533906, 4), x_dir=(0, 0, 1), z_dir=(-0.7071067811865462, 0.7071067811865489, 0))) as fillet7_piece_12b_section:
        with BuildLine():
            CenterArc((FILLET7_R, FILLET7_R), FILLET7_R, 180, 90)
            Line((0, FILLET7_R), (0, 0))
            Line((0, 0), (FILLET7_R, 0))
        make_face()
    fillet7_piece_12b = extrude(amount=12.686291501, mode=Mode.PRIVATE)
    fillet7_piece_12b = split(fillet7_piece_12b, bisect_by=Plane(origin=(-1.094042521, 2.219665978, 4.452790229), z_dir=(-0.7071067811865461, 0.707106781186549, 0)), keep=Keep.TOP, mode=Mode.PRIVATE)
    fillet7_piece_12 = fillet7_piece_12a & fillet7_piece_12b
    add(fillet7_piece_12)
    with BuildSketch(Plane(origin=(-23.237436867, 6.762563133, 4), x_dir=(-0.7071067811865498, -0.7071067811865454, 0), z_dir=(0.7071067811865452, -0.7071067811865498, 0))) as fillet7_piece_13a_section:
        with BuildLine():
            CenterArc((FILLET7_R, -FILLET7_R), FILLET7_R, 90, 90)
            Line((0, -FILLET7_R), (0, 0))
            Line((0, 0), (FILLET7_R, 0))
        make_face()
    fillet7_piece_13a = extrude(amount=9, mode=Mode.PRIVATE)
    fillet7_piece_13a = split(fillet7_piece_13a, bisect_by=Plane(origin=(-20.729180783, 3.613964967, 4.452790229), z_dir=(0.7071067811865448, -0.7071067811865502, 0)), keep=Keep.TOP, mode=Mode.PRIVATE)
    with BuildSketch(Plane(origin=(-23.944543648, 0.398602102, 4), x_dir=(0.7071067811865449, -0.7071067811865502, 0), z_dir=(0.7071067811865502, 0.7071067811865448, 0))) as fillet7_piece_13b_section:
        with BuildLine():
            CenterArc((FILLET7_R, -FILLET7_R), FILLET7_R, 90, 90)
            Line((0, -FILLET7_R), (0, 0))
            Line((0, 0), (FILLET7_R, 0))
        make_face()
    fillet7_piece_13b = extrude(amount=8.5, mode=Mode.PRIVATE)
    fillet7_piece_13b = fillet7_piece_13b - Plane(origin=(-24.733876437, -20, 4.460562429), x_dir=(-0.7071067811865476, -0.7071067811865476, 0), z_dir=(0, 0, -1)) * Cylinder(20, 25, mode=Mode.PRIVATE)
    fillet7_piece_13b = split(fillet7_piece_13b, bisect_by=Plane(origin=(-20.100530502, 3.625656768, 4.460562429), z_dir=(-0.7071067811865498, -0.7071067811865452, 0)), keep=Keep.TOP, mode=Mode.PRIVATE)
    fillet7_piece_13 = fillet7_piece_13a & fillet7_piece_13b
    add(fillet7_piece_13)
    with BuildSketch(Plane(origin=(-20.409009742, 3.934136008, 4), x_dir=(0.7071067811865449, -0.7071067811865502, 0), z_dir=(0.7071067811865502, 0.7071067811865448, 0))) as fillet7_piece_14a_section:
        with BuildLine():
            CenterArc((FILLET7_R, -FILLET7_R), FILLET7_R, 90, 90)
            Line((0, -FILLET7_R), (0, 0))
            Line((0, 0), (FILLET7_R, 0))
        make_face()
    fillet7_piece_14a = extrude(amount=8.5, mode=Mode.PRIVATE)
    fillet7_piece_14a = split(fillet7_piece_14a, bisect_by=Plane(origin=(-17.613964967, 6.088838701, 4.452790229), z_dir=(0.7071067811865507, 0.7071067811865445, 0)), keep=Keep.TOP, mode=Mode.PRIVATE)
    with BuildSketch(Plane(origin=(-14.398602102, 2.873475836, 4), x_dir=(0.7071067811865507, 0.7071067811865445, 0), z_dir=(-0.7071067811865445, 0.7071067811865507, 0))) as fillet7_piece_14b_section:
        with BuildLine():
            CenterArc((FILLET7_R, -FILLET7_R), FILLET7_R, 90, 90)
            Line((0, -FILLET7_R), (0, 0))
            Line((0, 0), (FILLET7_R, 0))
        make_face()
    fillet7_piece_14b = extrude(amount=9, mode=Mode.PRIVATE)
    fillet7_piece_14b = split(fillet7_piece_14b, bisect_by=Plane(origin=(-17.613964967, 6.729180783, 4.452790229), z_dir=(0.7071067811865448, -0.7071067811865502, 0)), keep=Keep.TOP, mode=Mode.PRIVATE)
    fillet7_piece_14 = fillet7_piece_14a & fillet7_piece_14b
    add(fillet7_piece_14)
    with BuildSketch(Plane(origin=(-11.237436867, 18.762563133, 4), x_dir=(-0.7071067811865507, -0.7071067811865445, 0), z_dir=(0.7071067811865445, -0.7071067811865507, 0))) as fillet7_piece_15a_section:
        with BuildLine():
            CenterArc((FILLET7_R, -FILLET7_R), FILLET7_R, 90, 90)
            Line((0, -FILLET7_R), (0, 0))
            Line((0, 0), (FILLET7_R, 0))
        make_face()
    fillet7_piece_15a = extrude(amount=9, mode=Mode.PRIVATE)
    fillet7_piece_15a = split(fillet7_piece_15a, bisect_by=Plane(origin=(-8.729180783, 15.613964967, 4.452790229), z_dir=(0.7071067811865444, -0.7071067811865507, 0)), keep=Keep.TOP, mode=Mode.PRIVATE)
    with BuildSketch(Plane(origin=(-11.944543648, 12.398602102, 4), x_dir=(0.7071067811865442, -0.7071067811865507, 0), z_dir=(0.7071067811865507, 0.7071067811865444, 0))) as fillet7_piece_15b_section:
        with BuildLine():
            CenterArc((FILLET7_R, -FILLET7_R), FILLET7_R, 90, 90)
            Line((0, -FILLET7_R), (0, 0))
            Line((0, 0), (FILLET7_R, 0))
        make_face()
    fillet7_piece_15b = extrude(amount=8.5, mode=Mode.PRIVATE)
    fillet7_piece_15b = split(fillet7_piece_15b, bisect_by=Plane(origin=(-8.088838701, 15.613964967, 4.452790229), z_dir=(-0.7071067811865507, -0.7071067811865445, 0)), keep=Keep.TOP, mode=Mode.PRIVATE)
    fillet7_piece_15 = fillet7_piece_15a & fillet7_piece_15b
    add(fillet7_piece_15)
    with BuildSketch(Plane(origin=(-8.409009742, 15.934136008, 4), x_dir=(0.7071067811865444, -0.7071067811865508, 0), z_dir=(0.7071067811865507, 0.7071067811865444, 0))) as fillet7_piece_16a_section:
        with BuildLine():
            CenterArc((FILLET7_R, -FILLET7_R), FILLET7_R, 90, 90)
            Line((0, -FILLET7_R), (0, 0))
            Line((0, 0), (FILLET7_R, 0))
        make_face()
    fillet7_piece_16a = extrude(amount=8.5, mode=Mode.PRIVATE)
    fillet7_piece_16a = split(fillet7_piece_16a, bisect_by=Plane(origin=(-5.613964967, 18.088838701, 4.452790229), z_dir=(0.7071067811865506, 0.7071067811865446, 0)), keep=Keep.TOP, mode=Mode.PRIVATE)
    with BuildSketch(Plane(origin=(-2.398602102, 14.873475836, 4), x_dir=(0.7071067811865505, 0.7071067811865445, 0), z_dir=(-0.7071067811865446, 0.7071067811865506, 0))) as fillet7_piece_16b_section:
        with BuildLine():
            CenterArc((FILLET7_R, -FILLET7_R), FILLET7_R, 90, 90)
            Line((0, -FILLET7_R), (0, 0))
            Line((0, 0), (FILLET7_R, 0))
        make_face()
    fillet7_piece_16b = extrude(amount=9, mode=Mode.PRIVATE)
    fillet7_piece_16b = split(fillet7_piece_16b, bisect_by=Plane(origin=(-5.613964967, 18.729180783, 4.452790229), z_dir=(0.7071067811865444, -0.7071067811865507, 0)), keep=Keep.TOP, mode=Mode.PRIVATE)
    fillet7_piece_16 = fillet7_piece_16a & fillet7_piece_16b
    add(fillet7_piece_16)
    with BuildSketch(Plane(origin=(11.433681901, 18.534544098, 4), x_dir=(-0.7071067811865447, 0.7071067811865505, 0), z_dir=(-0.7071067811865505, -0.7071067811865447, 0))) as fillet7_piece_17a_section:
        with BuildLine():
            CenterArc((FILLET7_R, -FILLET7_R), FILLET7_R, 90, 90)
            Line((0, -FILLET7_R), (0, 0))
            Line((0, 0), (FILLET7_R, 0))
        make_face()
    fillet7_piece_17a = extrude(amount=8.977532388, mode=Mode.PRIVATE)
    fillet7_piece_17a = split(fillet7_piece_17a, bisect_by=Plane(origin=(8.300970736, 16.042175015, 4.452790229), z_dir=(-0.7071067811865503, -0.7071067811865448, 0)), keep=Keep.TOP, mode=Mode.PRIVATE)
    with BuildSketch(Plane(origin=(5.085607871, 19.25753788, 4), x_dir=(-0.7071067811865503, -0.7071067811865448, 0), z_dir=(0.7071067811865448, -0.7071067811865503, 0))) as fillet7_piece_17b_section:
        with BuildLine():
            CenterArc((FILLET7_R, -FILLET7_R), FILLET7_R, 90, 90)
            Line((0, -FILLET7_R), (0, 0))
            Line((0, 0), (FILLET7_R, 0))
        make_face()
    fillet7_piece_17b = extrude(amount=8.5, mode=Mode.PRIVATE)
    fillet7_piece_17b = split(fillet7_piece_17b, bisect_by=Plane(origin=(8.300970736, 15.401832933, 4.452790229), z_dir=(-0.7071067811865447, 0.7071067811865505, 0)), keep=Keep.TOP, mode=Mode.PRIVATE)
    fillet7_piece_17 = fillet7_piece_17a & fillet7_piece_17b
    add(fillet7_piece_17)
    with BuildSketch(Plane(origin=(8.621141777, 15.722003974, 4), x_dir=(-0.7071067811865503, -0.7071067811865448, 0), z_dir=(0.7071067811865448, -0.7071067811865503, 0))) as fillet7_piece_18a_section:
        with BuildLine():
            CenterArc((FILLET7_R, -FILLET7_R), FILLET7_R, 90, 90)
            Line((0, -FILLET7_R), (0, 0))
            Line((0, 0), (FILLET7_R, 0))
        make_face()
    fillet7_piece_18a = extrude(amount=8.5, mode=Mode.PRIVATE)
    fillet7_piece_18a = split(fillet7_piece_18a, bisect_by=Plane(origin=(10.77584447, 12.926959199, 4.452790229), z_dir=(0.7071067811865447, -0.7071067811865505, 0)), keep=Keep.TOP, mode=Mode.PRIVATE)
    with BuildSketch(Plane(origin=(7.560481605, 9.711596334, 4), x_dir=(0.7071067811865447, -0.7071067811865505, 0), z_dir=(0.7071067811865505, 0.7071067811865447, 0))) as fillet7_piece_18b_section:
        with BuildLine():
            CenterArc((FILLET7_R, -FILLET7_R), FILLET7_R, 90, 90)
            Line((0, -FILLET7_R), (0, 0))
            Line((0, 0), (FILLET7_R, 0))
        make_face()
    fillet7_piece_18b = extrude(amount=8.977532388, mode=Mode.PRIVATE)
    fillet7_piece_18b = split(fillet7_piece_18b, bisect_by=Plane(origin=(11.416186552, 12.926959199, 4.452790229), z_dir=(-0.7071067811865503, -0.7071067811865448, 0)), keep=Keep.TOP, mode=Mode.PRIVATE)
    fillet7_piece_18 = fillet7_piece_18a & fillet7_piece_18b
    add(fillet7_piece_18)

    # Fillet8
    fillet8_edges = [part_1.edges().sort_by_distance(p)[0] for p in [
        (8.66205807, -8.176776695, 13),
        (0.176776695, -16.66205807, 13),
    ]]
    fillet(fillet8_edges, radius=FILLET8_R)


solid = part_1.part
